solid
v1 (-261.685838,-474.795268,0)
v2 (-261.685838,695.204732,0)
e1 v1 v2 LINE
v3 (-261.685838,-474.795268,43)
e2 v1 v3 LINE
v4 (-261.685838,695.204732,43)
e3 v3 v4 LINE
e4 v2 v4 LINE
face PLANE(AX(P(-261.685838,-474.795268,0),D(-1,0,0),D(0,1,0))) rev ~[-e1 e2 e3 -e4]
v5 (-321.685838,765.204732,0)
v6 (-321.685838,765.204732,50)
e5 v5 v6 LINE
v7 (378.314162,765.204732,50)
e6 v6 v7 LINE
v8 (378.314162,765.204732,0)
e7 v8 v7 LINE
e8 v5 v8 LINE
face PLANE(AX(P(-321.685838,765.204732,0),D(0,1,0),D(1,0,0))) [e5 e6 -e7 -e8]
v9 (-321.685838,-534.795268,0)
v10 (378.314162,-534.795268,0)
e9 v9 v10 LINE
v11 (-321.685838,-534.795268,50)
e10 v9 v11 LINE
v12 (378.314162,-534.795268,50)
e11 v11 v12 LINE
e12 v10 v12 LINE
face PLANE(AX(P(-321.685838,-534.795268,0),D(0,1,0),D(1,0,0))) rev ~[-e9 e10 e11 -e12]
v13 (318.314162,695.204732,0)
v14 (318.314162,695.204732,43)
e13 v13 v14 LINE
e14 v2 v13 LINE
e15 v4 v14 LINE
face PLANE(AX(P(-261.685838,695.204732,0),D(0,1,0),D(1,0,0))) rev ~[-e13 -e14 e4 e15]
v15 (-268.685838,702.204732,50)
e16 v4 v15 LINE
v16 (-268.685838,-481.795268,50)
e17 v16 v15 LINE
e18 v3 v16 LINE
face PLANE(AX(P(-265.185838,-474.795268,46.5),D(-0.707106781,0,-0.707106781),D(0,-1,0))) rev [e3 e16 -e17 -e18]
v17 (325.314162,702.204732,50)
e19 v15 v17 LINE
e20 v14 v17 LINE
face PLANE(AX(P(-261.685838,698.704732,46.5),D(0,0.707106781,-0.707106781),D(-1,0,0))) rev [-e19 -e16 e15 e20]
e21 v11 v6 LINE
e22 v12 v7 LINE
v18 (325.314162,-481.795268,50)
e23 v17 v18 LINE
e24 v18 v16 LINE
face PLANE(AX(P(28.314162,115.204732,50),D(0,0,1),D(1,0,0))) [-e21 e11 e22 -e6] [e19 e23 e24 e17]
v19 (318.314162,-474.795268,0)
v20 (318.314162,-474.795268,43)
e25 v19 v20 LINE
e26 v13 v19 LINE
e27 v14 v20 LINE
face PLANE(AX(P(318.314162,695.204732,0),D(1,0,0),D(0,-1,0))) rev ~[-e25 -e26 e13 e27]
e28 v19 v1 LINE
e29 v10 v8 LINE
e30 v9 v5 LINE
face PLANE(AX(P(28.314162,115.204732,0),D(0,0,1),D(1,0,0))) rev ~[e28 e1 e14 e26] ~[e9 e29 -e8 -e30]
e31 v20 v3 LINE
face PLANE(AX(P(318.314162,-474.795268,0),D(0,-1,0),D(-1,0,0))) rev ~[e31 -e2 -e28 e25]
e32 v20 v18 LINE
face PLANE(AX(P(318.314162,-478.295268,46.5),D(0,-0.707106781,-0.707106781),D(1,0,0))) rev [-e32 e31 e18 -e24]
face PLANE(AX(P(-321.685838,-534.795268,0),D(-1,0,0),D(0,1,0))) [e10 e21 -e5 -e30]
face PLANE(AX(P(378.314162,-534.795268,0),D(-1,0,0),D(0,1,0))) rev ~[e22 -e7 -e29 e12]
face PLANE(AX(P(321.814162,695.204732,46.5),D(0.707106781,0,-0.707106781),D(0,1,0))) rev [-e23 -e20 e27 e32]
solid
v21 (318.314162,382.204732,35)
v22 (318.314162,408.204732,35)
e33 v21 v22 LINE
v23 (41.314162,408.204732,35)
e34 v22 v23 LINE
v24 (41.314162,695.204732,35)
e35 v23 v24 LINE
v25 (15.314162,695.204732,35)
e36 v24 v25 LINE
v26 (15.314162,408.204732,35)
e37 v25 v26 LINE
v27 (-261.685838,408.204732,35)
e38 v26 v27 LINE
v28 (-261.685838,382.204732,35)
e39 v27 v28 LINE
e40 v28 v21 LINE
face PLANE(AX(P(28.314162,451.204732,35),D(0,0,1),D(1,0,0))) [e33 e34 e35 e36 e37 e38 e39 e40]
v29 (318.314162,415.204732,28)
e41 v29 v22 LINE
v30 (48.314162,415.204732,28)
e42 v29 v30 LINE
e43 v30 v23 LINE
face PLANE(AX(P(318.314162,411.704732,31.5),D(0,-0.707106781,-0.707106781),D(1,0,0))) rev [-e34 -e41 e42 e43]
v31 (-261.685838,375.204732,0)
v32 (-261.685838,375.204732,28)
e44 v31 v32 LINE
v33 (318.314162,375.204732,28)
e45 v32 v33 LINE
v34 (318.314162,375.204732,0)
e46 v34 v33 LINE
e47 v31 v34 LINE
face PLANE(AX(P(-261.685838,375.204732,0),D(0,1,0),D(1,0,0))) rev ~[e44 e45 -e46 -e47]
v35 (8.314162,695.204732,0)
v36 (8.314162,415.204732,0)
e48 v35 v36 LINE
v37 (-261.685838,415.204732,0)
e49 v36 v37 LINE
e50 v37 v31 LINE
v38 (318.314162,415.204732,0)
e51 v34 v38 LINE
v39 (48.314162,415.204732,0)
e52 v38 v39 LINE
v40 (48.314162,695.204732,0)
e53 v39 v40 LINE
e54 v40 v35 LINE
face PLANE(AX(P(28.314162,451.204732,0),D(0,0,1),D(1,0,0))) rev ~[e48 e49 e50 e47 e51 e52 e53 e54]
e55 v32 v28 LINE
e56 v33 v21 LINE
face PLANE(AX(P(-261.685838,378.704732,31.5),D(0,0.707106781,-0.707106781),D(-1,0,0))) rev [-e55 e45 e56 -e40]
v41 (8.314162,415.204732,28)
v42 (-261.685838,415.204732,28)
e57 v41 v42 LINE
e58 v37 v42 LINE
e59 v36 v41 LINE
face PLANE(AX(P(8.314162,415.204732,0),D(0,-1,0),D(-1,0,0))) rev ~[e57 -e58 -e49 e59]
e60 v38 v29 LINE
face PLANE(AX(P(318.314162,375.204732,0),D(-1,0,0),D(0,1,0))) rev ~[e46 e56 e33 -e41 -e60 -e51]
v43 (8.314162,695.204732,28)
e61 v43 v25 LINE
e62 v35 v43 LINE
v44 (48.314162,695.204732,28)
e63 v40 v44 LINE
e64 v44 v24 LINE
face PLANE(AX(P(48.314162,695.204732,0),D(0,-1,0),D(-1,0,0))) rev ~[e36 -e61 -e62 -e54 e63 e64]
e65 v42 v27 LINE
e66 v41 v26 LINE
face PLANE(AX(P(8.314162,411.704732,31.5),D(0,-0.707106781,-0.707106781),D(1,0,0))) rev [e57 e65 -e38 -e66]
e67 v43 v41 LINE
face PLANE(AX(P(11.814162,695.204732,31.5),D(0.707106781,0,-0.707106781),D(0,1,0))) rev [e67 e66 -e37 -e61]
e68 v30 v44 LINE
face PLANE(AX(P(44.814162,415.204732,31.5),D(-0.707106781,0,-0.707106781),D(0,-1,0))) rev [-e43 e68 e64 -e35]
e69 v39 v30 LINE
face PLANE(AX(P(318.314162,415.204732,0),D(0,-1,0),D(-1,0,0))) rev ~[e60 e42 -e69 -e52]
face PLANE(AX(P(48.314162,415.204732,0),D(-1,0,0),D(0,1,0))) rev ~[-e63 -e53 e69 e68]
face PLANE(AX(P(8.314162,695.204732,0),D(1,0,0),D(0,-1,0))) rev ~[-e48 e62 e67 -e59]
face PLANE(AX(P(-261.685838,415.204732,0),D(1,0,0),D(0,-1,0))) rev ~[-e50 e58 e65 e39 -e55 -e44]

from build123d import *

# Parameters (mm, degrees)
F0_W      = 700
F0_H      = 1300
F1_DEPTH  = 50
F2_DEPTH  = 35
F3_SIZE   = 7
F3_2_SIZE = 7


# Not quite as in the source:
# - a feature names something its author has since deleted; it is built from what else it names


with BuildPart() as f1:
    # F0 (on Top) → F1 (new body)
    with BuildSketch(Plane.XY):
        with Locations((28.3141621128, 115.2047318473)):
            Rectangle(F0_W, F0_H)
        Polygon((-261.6858378872, 415.2047318473), (-261.6858378872, 695.2047318473), (8.3141621128, 695.2047318473), (48.3141621128, 695.2047318473), (318.3141621128, 695.2047318473), (318.3141621128, 415.2047318473), (318.3141621128, 375.2047318473), (318.3141621128, -474.7952681527), (-261.6858378872, -474.7952681527), (-261.6858378872, 375.2047318473), align=None, mode=Mode.SUBTRACT)
    extrude(amount=F1_DEPTH)

    # F3
    f3_edges = [f1.edges().sort_by_distance(p)[0] for p in [
        (-261.685838, 110.204732, 50),
        (318.314162, 110.204732, 50),
        (28.314162, 695.204732, 50),
        (28.314162, -474.795268, 50),
    ]]
    chamfer(f3_edges, length=F3_SIZE)


with BuildPart() as f2:
    # F0 (on Top) → F2 (new body)
    with BuildSketch(Plane.XY):
        Polygon((48.3141621128, 695.2047318473), (8.3141621128, 695.2047318473), (8.3141621128, 415.2047318473), (-261.6858378872, 415.2047318473), (-261.6858378872, 375.2047318473), (318.3141621128, 375.2047318473), (318.3141621128, 415.2047318473), (48.3141621128, 415.2047318473), align=None)
    extrude(amount=F2_DEPTH)

    # F3#2
    f3_2_edges = [f2.edges().sort_by_distance(p)[0] for p in [
        (8.314162, 555.204732, 35),
        (48.314162, 555.204732, 35),
        (-126.685838, 415.204732, 35),
        (183.314162, 415.204732, 35),
        (28.314162, 375.204732, 35),
    ]]
    chamfer(f3_2_edges, length=F3_2_SIZE)


solid = Compound([f1.part, f2.part])
